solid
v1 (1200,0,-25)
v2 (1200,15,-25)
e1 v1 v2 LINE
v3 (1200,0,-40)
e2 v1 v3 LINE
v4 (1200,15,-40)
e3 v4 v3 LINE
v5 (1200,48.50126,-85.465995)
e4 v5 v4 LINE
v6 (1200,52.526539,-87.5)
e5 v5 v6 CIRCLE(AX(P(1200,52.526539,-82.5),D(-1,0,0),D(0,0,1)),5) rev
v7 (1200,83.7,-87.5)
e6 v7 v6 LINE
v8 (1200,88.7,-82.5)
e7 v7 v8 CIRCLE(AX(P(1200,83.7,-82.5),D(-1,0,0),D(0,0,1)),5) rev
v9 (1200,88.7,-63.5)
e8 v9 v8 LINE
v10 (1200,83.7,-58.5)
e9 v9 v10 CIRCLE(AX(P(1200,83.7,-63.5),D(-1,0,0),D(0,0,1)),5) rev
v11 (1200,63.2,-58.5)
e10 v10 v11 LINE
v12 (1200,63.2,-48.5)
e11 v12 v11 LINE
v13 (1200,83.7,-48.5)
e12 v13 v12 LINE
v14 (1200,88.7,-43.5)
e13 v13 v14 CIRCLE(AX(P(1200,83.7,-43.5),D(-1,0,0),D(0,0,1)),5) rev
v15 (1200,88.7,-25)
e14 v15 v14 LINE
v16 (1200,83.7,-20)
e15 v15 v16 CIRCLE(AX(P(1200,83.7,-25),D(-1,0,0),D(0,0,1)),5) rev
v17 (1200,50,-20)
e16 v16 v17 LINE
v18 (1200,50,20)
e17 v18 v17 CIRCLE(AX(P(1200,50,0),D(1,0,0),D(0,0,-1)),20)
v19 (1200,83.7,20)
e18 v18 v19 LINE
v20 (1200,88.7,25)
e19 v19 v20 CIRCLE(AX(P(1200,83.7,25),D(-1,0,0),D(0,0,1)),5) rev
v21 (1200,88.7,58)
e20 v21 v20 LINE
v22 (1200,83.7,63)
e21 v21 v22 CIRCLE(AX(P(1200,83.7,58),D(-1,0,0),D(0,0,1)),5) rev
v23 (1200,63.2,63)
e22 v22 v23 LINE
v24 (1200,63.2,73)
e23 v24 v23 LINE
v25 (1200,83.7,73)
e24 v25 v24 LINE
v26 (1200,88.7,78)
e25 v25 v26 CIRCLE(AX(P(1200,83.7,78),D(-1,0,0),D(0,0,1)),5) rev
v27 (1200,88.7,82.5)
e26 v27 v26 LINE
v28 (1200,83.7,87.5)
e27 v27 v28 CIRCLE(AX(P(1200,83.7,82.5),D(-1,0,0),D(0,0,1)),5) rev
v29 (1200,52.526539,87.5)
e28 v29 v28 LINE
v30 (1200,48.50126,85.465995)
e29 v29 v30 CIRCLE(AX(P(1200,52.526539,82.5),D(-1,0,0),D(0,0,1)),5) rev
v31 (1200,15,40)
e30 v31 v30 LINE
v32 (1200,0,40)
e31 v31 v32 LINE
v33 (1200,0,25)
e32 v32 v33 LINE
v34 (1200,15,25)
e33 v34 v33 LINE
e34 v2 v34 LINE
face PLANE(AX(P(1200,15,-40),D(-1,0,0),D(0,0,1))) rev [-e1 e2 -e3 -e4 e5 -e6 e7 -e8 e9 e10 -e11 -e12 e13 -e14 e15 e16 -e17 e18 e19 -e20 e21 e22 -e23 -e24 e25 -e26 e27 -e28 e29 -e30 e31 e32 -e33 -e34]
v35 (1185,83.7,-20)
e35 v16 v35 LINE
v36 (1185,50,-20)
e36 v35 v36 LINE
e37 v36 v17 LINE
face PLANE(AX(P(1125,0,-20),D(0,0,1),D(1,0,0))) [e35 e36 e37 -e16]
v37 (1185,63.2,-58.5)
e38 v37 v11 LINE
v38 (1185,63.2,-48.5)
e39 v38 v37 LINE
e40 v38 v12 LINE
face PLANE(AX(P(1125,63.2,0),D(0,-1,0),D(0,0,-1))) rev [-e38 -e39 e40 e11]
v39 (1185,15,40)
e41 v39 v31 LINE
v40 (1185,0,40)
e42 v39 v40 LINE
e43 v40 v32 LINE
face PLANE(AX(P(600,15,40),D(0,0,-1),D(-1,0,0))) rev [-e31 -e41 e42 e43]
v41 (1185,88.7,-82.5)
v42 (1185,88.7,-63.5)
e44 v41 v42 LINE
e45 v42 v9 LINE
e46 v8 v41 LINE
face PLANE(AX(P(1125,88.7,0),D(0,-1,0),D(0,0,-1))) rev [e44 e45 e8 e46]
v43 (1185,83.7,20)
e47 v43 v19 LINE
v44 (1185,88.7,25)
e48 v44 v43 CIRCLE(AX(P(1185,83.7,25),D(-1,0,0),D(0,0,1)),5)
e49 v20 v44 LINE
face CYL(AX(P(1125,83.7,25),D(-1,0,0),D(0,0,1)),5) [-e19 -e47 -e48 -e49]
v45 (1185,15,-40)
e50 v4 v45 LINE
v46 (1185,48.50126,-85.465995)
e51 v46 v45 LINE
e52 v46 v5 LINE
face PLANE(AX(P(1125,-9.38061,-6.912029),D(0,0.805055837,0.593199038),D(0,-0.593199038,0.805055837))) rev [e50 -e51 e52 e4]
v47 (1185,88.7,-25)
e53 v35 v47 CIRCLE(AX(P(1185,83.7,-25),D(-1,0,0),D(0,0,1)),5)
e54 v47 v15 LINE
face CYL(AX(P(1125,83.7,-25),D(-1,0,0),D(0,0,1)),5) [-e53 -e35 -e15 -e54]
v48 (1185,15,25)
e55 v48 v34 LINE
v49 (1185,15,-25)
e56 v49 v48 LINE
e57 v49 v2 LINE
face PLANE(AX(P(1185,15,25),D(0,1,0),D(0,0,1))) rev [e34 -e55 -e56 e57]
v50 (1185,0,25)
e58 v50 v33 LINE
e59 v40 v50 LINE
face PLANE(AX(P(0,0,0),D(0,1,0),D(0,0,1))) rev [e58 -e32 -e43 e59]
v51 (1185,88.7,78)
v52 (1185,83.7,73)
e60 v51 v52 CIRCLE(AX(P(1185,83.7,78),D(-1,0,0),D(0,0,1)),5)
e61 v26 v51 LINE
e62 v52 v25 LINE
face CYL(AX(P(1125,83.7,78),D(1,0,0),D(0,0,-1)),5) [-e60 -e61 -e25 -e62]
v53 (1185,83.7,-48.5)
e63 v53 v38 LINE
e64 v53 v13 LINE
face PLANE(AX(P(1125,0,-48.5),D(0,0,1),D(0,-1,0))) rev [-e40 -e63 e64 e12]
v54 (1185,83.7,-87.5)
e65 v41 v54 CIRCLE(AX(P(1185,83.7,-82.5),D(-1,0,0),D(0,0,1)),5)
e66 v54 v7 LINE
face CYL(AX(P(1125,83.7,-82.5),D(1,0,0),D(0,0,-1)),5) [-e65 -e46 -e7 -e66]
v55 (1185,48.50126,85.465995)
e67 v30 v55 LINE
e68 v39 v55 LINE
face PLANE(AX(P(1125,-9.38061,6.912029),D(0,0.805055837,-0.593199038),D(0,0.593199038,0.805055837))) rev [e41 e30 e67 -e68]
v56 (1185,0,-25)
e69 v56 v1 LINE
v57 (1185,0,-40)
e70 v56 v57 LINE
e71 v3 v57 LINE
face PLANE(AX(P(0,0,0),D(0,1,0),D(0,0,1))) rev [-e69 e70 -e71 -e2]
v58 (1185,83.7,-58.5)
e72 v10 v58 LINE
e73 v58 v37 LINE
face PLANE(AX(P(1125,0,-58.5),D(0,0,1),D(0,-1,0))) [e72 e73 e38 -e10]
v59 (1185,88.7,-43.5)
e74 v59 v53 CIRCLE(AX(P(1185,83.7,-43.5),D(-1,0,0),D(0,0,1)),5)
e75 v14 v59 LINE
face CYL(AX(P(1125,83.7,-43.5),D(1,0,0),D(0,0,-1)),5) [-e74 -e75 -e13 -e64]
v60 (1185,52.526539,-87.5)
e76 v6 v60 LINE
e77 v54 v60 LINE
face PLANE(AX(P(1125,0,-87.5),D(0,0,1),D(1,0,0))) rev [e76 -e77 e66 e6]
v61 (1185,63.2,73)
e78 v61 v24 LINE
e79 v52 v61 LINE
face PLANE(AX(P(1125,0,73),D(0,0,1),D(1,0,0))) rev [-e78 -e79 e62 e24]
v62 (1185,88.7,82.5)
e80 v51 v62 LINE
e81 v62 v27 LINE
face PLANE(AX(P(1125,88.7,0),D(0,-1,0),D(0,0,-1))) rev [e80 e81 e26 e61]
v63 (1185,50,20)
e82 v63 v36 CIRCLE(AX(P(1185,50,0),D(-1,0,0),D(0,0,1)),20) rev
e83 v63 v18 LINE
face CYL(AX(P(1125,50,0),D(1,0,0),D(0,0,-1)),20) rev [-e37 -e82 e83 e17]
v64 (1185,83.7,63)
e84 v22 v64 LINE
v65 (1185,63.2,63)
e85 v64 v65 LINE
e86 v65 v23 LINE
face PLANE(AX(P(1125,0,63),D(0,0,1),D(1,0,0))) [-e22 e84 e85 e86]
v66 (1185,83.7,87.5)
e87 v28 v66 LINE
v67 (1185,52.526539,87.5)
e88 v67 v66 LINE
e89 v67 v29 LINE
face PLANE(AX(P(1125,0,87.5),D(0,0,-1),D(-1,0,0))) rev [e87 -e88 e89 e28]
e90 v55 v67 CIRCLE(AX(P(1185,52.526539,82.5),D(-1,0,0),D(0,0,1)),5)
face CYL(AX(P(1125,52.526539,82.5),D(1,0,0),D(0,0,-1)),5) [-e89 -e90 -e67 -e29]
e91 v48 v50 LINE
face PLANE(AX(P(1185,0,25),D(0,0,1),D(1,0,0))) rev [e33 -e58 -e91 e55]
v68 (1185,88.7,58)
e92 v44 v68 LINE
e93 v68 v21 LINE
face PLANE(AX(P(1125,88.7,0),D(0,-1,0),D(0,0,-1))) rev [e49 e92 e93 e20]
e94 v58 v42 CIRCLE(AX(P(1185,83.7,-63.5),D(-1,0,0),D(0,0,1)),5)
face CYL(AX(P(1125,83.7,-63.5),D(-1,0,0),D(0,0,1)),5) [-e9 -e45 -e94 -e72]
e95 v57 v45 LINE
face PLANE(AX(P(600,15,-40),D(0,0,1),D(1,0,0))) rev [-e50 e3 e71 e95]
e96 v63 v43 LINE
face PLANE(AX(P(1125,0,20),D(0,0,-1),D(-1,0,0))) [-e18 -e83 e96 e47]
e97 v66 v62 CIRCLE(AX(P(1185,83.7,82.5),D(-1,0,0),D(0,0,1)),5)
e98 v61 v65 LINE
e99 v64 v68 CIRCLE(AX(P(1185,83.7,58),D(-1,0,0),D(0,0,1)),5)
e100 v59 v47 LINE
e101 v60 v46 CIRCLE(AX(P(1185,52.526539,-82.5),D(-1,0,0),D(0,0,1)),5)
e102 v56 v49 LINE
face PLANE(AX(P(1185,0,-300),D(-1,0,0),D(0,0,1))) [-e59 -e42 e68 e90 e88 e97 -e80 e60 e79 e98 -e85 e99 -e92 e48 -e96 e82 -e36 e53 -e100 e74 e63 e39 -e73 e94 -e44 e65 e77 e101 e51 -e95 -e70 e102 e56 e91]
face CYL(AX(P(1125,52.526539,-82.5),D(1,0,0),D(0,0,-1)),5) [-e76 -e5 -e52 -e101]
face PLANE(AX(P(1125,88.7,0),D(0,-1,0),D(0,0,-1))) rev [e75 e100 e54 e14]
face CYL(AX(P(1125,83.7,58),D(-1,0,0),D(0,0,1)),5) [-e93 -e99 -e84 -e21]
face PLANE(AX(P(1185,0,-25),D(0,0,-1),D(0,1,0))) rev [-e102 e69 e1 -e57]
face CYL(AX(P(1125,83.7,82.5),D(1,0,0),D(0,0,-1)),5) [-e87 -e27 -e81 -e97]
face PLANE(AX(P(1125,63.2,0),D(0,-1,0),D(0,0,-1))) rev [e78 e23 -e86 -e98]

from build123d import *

# Parameters (mm, degrees)
BOSS_EXTRUDE1_DEPTH             = 15
BOSS_EXTRUDE2_REACH             = 1239.023
BOSS_EXTRUDE2_DIRECTION_2_REACH = 1239.023
CUT_EXTRUDE2_DEPTH              = 1238.578280352
CUT_EXTRUDE2_DEPTH_BACK         = 1238.578280352
SKETCH5_W                       = 40
SKETCH5_H                       = 40
CUT_EXTRUDE3_DEPTH              = 1238.578280352
BOSS_EXTRUDE4_DEPTH             = 75
CUT_EXTRUDE4_DEPTH              = 1241.107934819
CUT_EXTRUDE4_DEPTH_BACK         = 1241.107934819
SKETCH8_W                       = 15
SKETCH8_H                       = 73.7
FILLET1_R                       = 5
CUT_EXTRUDE5_DEPTH              = 1241.107934819
CUT_EXTRUDE5_DEPTH_BACK         = 1241.107934819
SKETCH9_W                       = 1635
SKETCH9_H                       = 600
SKETCH10_W                      = 50
SKETCH10_H                      = 15
CUT_EXTRUDE6_DEPTH              = 126.494780768


with BuildPart() as part:
    # Sketch1 → Boss-Extrude1 (new body)
    with BuildSketch(Plane(origin=(0, 0, 0), x_dir=(1, 0, 0), z_dir=(0, 1, 0))):
        Polygon((-450, 300), (-400, 300), (-200, 250), (600, 40), (1200, 40), (1200, -40), (600, -40), (-200, -250), (-400, -300), (-450, -300), align=None)
    extrude(amount=BOSS_EXTRUDE1_DEPTH)

    # Boss-Extrude2: up to this face of the body (flat: up to its plane)
    boss_extrude2_end = Plane(part.part.faces().sort_by_distance((-425, 7.5, 300))[0])
    # Sketch2 → Boss-Extrude2 (add, up to the picked face)
    with BuildSketch(Plane.XY, mode=Mode.PRIVATE) as boss_extrude2_sk1:
        with BuildLine():
            Line((-425, 0), (-450, 0))
            Line((-450, 0), (-450, -40))
            Line((-450, -40), (-440, -40))
            Line((-440, -40), (-440, -15))
            ThreePointArc((-440, -15), (-435.606601718, -4.393398282), (-425, 0))
        make_face()
    boss_extrude2_tool1 = split(extrude(boss_extrude2_sk1.sketch, amount=BOSS_EXTRUDE2_REACH, mode=Mode.PRIVATE), bisect_by=boss_extrude2_end, keep=Keep.BOTH, mode=Mode.PRIVATE)
    # Sketch2 → Boss-Extrude2 (add, up to the picked face)
    with BuildSketch(Plane.XY, mode=Mode.PRIVATE) as boss_extrude2_sk2:
        with BuildLine():
            Line((-400, 0), (-425, 0))
            ThreePointArc((-425, 0), (-414.393398282, -4.393398282), (-410, -15))
            Line((-410, -15), (-410, -40))
            Line((-410, -40), (-400, -40))
            Line((-400, -40), (-400, 0))
        make_face()
    boss_extrude2_tool2 = split(extrude(boss_extrude2_sk2.sketch, amount=BOSS_EXTRUDE2_REACH, mode=Mode.PRIVATE), bisect_by=boss_extrude2_end, keep=Keep.BOTH, mode=Mode.PRIVATE)
    add(boss_extrude2_tool1.solids().sort_by(Axis((-444.100555, -18.206662, 0), (0, 0, 1)))[0])
    add(boss_extrude2_tool2.solids().sort_by(Axis((-405.899445, -18.206662, 0), (0, 0, 1)))[0])

    # Boss-Extrude2 direction 2: up to this face of the body (flat: up to its plane)
    boss_extrude2_direction_2_end = Plane(part.part.faces().sort_by_distance((-425, 7.5, -300))[0])
    # Sketch2 → Boss-Extrude2 direction 2 (add, up to the picked face)
    with BuildSketch(Plane.XY, mode=Mode.PRIVATE) as boss_extrude2_direction_2_sk1:
        with BuildLine():
            Line((-425, 0), (-450, 0))
            Line((-450, 0), (-450, -40))
            Line((-450, -40), (-440, -40))
            Line((-440, -40), (-440, -15))
            ThreePointArc((-440, -15), (-435.606601718, -4.393398282), (-425, 0))
        make_face()
    boss_extrude2_direction_2_tool1 = split(extrude(boss_extrude2_direction_2_sk1.sketch, amount=-BOSS_EXTRUDE2_DIRECTION_2_REACH, mode=Mode.PRIVATE), bisect_by=boss_extrude2_direction_2_end, keep=Keep.BOTH, mode=Mode.PRIVATE)
    # Sketch2 → Boss-Extrude2 direction 2 (add, up to the picked face)
    with BuildSketch(Plane.XY, mode=Mode.PRIVATE) as boss_extrude2_direction_2_sk2:
        with BuildLine():
            Line((-400, 0), (-425, 0))
            ThreePointArc((-425, 0), (-414.393398282, -4.393398282), (-410, -15))
            Line((-410, -15), (-410, -40))
            Line((-410, -40), (-400, -40))
            Line((-400, -40), (-400, 0))
        make_face()
    boss_extrude2_direction_2_tool2 = split(extrude(boss_extrude2_direction_2_sk2.sketch, amount=-BOSS_EXTRUDE2_DIRECTION_2_REACH, mode=Mode.PRIVATE), bisect_by=boss_extrude2_direction_2_end, keep=Keep.BOTH, mode=Mode.PRIVATE)
    add(boss_extrude2_direction_2_tool1.solids().sort_by(Axis((-444.100555, -18.206662, 0), (0, 0, -1)))[0])
    add(boss_extrude2_direction_2_tool2.solids().sort_by(Axis((-405.899445, -18.206662, 0), (0, 0, -1)))[0])

    # Sketch4 → Cut-Extrude2 (cut, two sides: drawn at the far end of the back side and taken through both)
    with BuildSketch(Plane(origin=(0, 0, 0), x_dir=(1, 0, 0), z_dir=(0, 1, 0)).offset(-CUT_EXTRUDE2_DEPTH_BACK)):
        Polygon((-450, 230), (-400, 230), (-150, 167.5), (-150, -167.5), (-400, -230), (-450, -230), align=None)
        Polygon((-100, 155), (-100, -155), (520, 0), align=None)
    extrude(amount=CUT_EXTRUDE2_DEPTH + CUT_EXTRUDE2_DEPTH_BACK, mode=Mode.SUBTRACT)

    # Sketch5 → Cut-Extrude3 (cut, through all)
    with BuildSketch(Plane(origin=(0, 0, 0), x_dir=(0, 0, -1), z_dir=(1, 0, 0))):
        with Locations((-265, -20)):
            Rectangle(SKETCH5_W, SKETCH5_H)
        with Locations((265, -20)):
            Rectangle(SKETCH5_W, SKETCH5_H)
    extrude(amount=-CUT_EXTRUDE3_DEPTH, mode=Mode.SUBTRACT)

    # Sketch7 → Boss-Extrude4 (add)
    with BuildSketch(Plane(origin=(1200, 0, 0), x_dir=(0, 0, -1), z_dir=(1, 0, 0))):
        with BuildLine():
            Line((-87.5, 50), (-40, 15))
            Line((-40, 15), (40, 15))
            Line((40, 15), (87.5, 50))
            Line((87.5, 50), (87.5, 88.7))
            Line((87.5, 88.7), (58.5, 88.7))
            Line((58.5, 88.7), (58.5, 63.2))
            Line((58.5, 63.2), (48.5, 63.2))
            Line((48.5, 63.2), (48.5, 88.7))
            Line((48.5, 88.7), (20, 88.7))
            Line((20, 88.7), (20, 50))
            ThreePointArc((20, 50), (0, 30), (-20, 50))
            Line((-20, 50), (-20, 88.7))
            Line((-20, 88.7), (-63, 88.7))
            Line((-63, 88.7), (-63, 63.2))
            Line((-63, 63.2), (-73, 63.2))
            Line((-73, 63.2), (-73, 88.7))
            Line((-73, 88.7), (-87.5, 88.7))
            Line((-87.5, 88.7), (-87.5, 50))
        make_face()
    extrude(amount=-BOSS_EXTRUDE4_DEPTH)

    # Sketch8 → Cut-Extrude4 (cut, two sides: drawn at the far end of the back side and taken through both)
    with BuildSketch(Plane.XY.offset(-CUT_EXTRUDE4_DEPTH_BACK)):
        with Locations((1147.5, 51.85)):
            Rectangle(SKETCH8_W, SKETCH8_H)
        with Locations((1177.5, 51.85)):
            Rectangle(SKETCH8_W, SKETCH8_H)
    extrude(amount=CUT_EXTRUDE4_DEPTH + CUT_EXTRUDE4_DEPTH_BACK, mode=Mode.SUBTRACT)

    # Fillet1
    fillet1_edges = [part.edges().sort_by_distance(p)[0] for p in [
        (1192.5, 50, 87.5),
        (1162.5, 50, 87.5),
        (1132.5, 50, 87.5),
        (1192.5, 50, -87.5),
        (1162.5, 50, -87.5),
        (1132.5, 50, -87.5),
        (1192.5, 88.7, -87.5),
        (1162.5, 88.7, -87.5),
        (1132.5, 88.7, -87.5),
        (1132.5, 88.7, -58.5),
        (1162.5, 88.7, -58.5),
        (1192.5, 88.7, -58.5),
        (1192.5, 88.7, -48.5),
        (1162.5, 88.7, -48.5),
        (1132.5, 88.7, -48.5),
        (1192.5, 88.7, -20),
        (1162.5, 88.7, -20),
        (1132.5, 88.7, -20),
        (1192.5, 88.7, 63),
        (1162.5, 88.7, 63),
        (1132.5, 88.7, 63),
        (1132.5, 88.7, 87.5),
        (1162.5, 88.7, 87.5),
        (1192.5, 88.7, 87.5),
        (1192.5, 88.7, 73),
        (1162.5, 88.7, 73),
        (1132.5, 88.7, 73),
        (1192.5, 88.7, 20),
        (1162.5, 88.7, 20),
        (1132.5, 88.7, 20),
        (600, 7.5, 40),
        (600, 7.5, -40),
        (520, 7.5, 0),
        (-440, -40, -292.5),
        (-440, -40, -237.5),
        (-400, -40, -292.5),
        (-400, -40, -237.5),
        (-450, -40, -237.5),
        (-410, -40, -237.5),
        (-450, -40, -292.5),
        (-410, -40, -292.5),
        (-150, 7.5, 167.5),
        (-100, 7.5, 155),
        (-150, 7.5, -167.5),
        (-100, 7.5, -155),
        (-450, -40, 237.5),
        (-410, -40, 237.5),
        (-440, -40, 237.5),
        (-400, -40, 237.5),
        (-450, -40, 292.5),
        (-440, -40, 292.5),
        (-400, -40, 292.5),
        (-410, -40, 292.5),
    ]]
    fillet(fillet1_edges, radius=FILLET1_R - 0.0001)  # a hair under: the kernel refuses the full size

    # Sketch9 → Cut-Extrude5 (cut, two sides: drawn at the far end of the back side and taken through both)
    with BuildSketch(Plane(origin=(0, 0, 0), x_dir=(1, 0, 0), z_dir=(0, 1, 0)).offset(-CUT_EXTRUDE5_DEPTH_BACK)):
        with Locations((367.5, 0)):
            Rectangle(SKETCH9_W, SKETCH9_H)
    extrude(amount=CUT_EXTRUDE5_DEPTH + CUT_EXTRUDE5_DEPTH_BACK, mode=Mode.SUBTRACT)

    # Sketch10 → Cut-Extrude6 (cut, through all)
    with BuildSketch(Plane(origin=(1200, 0, 0), x_dir=(0, 0, -1), z_dir=(1, 0, 0))):
        with Locations((0, 7.5)):
            Rectangle(SKETCH10_W, SKETCH10_H)
    extrude(amount=-CUT_EXTRUDE6_DEPTH, mode=Mode.SUBTRACT)


solid = part.part
